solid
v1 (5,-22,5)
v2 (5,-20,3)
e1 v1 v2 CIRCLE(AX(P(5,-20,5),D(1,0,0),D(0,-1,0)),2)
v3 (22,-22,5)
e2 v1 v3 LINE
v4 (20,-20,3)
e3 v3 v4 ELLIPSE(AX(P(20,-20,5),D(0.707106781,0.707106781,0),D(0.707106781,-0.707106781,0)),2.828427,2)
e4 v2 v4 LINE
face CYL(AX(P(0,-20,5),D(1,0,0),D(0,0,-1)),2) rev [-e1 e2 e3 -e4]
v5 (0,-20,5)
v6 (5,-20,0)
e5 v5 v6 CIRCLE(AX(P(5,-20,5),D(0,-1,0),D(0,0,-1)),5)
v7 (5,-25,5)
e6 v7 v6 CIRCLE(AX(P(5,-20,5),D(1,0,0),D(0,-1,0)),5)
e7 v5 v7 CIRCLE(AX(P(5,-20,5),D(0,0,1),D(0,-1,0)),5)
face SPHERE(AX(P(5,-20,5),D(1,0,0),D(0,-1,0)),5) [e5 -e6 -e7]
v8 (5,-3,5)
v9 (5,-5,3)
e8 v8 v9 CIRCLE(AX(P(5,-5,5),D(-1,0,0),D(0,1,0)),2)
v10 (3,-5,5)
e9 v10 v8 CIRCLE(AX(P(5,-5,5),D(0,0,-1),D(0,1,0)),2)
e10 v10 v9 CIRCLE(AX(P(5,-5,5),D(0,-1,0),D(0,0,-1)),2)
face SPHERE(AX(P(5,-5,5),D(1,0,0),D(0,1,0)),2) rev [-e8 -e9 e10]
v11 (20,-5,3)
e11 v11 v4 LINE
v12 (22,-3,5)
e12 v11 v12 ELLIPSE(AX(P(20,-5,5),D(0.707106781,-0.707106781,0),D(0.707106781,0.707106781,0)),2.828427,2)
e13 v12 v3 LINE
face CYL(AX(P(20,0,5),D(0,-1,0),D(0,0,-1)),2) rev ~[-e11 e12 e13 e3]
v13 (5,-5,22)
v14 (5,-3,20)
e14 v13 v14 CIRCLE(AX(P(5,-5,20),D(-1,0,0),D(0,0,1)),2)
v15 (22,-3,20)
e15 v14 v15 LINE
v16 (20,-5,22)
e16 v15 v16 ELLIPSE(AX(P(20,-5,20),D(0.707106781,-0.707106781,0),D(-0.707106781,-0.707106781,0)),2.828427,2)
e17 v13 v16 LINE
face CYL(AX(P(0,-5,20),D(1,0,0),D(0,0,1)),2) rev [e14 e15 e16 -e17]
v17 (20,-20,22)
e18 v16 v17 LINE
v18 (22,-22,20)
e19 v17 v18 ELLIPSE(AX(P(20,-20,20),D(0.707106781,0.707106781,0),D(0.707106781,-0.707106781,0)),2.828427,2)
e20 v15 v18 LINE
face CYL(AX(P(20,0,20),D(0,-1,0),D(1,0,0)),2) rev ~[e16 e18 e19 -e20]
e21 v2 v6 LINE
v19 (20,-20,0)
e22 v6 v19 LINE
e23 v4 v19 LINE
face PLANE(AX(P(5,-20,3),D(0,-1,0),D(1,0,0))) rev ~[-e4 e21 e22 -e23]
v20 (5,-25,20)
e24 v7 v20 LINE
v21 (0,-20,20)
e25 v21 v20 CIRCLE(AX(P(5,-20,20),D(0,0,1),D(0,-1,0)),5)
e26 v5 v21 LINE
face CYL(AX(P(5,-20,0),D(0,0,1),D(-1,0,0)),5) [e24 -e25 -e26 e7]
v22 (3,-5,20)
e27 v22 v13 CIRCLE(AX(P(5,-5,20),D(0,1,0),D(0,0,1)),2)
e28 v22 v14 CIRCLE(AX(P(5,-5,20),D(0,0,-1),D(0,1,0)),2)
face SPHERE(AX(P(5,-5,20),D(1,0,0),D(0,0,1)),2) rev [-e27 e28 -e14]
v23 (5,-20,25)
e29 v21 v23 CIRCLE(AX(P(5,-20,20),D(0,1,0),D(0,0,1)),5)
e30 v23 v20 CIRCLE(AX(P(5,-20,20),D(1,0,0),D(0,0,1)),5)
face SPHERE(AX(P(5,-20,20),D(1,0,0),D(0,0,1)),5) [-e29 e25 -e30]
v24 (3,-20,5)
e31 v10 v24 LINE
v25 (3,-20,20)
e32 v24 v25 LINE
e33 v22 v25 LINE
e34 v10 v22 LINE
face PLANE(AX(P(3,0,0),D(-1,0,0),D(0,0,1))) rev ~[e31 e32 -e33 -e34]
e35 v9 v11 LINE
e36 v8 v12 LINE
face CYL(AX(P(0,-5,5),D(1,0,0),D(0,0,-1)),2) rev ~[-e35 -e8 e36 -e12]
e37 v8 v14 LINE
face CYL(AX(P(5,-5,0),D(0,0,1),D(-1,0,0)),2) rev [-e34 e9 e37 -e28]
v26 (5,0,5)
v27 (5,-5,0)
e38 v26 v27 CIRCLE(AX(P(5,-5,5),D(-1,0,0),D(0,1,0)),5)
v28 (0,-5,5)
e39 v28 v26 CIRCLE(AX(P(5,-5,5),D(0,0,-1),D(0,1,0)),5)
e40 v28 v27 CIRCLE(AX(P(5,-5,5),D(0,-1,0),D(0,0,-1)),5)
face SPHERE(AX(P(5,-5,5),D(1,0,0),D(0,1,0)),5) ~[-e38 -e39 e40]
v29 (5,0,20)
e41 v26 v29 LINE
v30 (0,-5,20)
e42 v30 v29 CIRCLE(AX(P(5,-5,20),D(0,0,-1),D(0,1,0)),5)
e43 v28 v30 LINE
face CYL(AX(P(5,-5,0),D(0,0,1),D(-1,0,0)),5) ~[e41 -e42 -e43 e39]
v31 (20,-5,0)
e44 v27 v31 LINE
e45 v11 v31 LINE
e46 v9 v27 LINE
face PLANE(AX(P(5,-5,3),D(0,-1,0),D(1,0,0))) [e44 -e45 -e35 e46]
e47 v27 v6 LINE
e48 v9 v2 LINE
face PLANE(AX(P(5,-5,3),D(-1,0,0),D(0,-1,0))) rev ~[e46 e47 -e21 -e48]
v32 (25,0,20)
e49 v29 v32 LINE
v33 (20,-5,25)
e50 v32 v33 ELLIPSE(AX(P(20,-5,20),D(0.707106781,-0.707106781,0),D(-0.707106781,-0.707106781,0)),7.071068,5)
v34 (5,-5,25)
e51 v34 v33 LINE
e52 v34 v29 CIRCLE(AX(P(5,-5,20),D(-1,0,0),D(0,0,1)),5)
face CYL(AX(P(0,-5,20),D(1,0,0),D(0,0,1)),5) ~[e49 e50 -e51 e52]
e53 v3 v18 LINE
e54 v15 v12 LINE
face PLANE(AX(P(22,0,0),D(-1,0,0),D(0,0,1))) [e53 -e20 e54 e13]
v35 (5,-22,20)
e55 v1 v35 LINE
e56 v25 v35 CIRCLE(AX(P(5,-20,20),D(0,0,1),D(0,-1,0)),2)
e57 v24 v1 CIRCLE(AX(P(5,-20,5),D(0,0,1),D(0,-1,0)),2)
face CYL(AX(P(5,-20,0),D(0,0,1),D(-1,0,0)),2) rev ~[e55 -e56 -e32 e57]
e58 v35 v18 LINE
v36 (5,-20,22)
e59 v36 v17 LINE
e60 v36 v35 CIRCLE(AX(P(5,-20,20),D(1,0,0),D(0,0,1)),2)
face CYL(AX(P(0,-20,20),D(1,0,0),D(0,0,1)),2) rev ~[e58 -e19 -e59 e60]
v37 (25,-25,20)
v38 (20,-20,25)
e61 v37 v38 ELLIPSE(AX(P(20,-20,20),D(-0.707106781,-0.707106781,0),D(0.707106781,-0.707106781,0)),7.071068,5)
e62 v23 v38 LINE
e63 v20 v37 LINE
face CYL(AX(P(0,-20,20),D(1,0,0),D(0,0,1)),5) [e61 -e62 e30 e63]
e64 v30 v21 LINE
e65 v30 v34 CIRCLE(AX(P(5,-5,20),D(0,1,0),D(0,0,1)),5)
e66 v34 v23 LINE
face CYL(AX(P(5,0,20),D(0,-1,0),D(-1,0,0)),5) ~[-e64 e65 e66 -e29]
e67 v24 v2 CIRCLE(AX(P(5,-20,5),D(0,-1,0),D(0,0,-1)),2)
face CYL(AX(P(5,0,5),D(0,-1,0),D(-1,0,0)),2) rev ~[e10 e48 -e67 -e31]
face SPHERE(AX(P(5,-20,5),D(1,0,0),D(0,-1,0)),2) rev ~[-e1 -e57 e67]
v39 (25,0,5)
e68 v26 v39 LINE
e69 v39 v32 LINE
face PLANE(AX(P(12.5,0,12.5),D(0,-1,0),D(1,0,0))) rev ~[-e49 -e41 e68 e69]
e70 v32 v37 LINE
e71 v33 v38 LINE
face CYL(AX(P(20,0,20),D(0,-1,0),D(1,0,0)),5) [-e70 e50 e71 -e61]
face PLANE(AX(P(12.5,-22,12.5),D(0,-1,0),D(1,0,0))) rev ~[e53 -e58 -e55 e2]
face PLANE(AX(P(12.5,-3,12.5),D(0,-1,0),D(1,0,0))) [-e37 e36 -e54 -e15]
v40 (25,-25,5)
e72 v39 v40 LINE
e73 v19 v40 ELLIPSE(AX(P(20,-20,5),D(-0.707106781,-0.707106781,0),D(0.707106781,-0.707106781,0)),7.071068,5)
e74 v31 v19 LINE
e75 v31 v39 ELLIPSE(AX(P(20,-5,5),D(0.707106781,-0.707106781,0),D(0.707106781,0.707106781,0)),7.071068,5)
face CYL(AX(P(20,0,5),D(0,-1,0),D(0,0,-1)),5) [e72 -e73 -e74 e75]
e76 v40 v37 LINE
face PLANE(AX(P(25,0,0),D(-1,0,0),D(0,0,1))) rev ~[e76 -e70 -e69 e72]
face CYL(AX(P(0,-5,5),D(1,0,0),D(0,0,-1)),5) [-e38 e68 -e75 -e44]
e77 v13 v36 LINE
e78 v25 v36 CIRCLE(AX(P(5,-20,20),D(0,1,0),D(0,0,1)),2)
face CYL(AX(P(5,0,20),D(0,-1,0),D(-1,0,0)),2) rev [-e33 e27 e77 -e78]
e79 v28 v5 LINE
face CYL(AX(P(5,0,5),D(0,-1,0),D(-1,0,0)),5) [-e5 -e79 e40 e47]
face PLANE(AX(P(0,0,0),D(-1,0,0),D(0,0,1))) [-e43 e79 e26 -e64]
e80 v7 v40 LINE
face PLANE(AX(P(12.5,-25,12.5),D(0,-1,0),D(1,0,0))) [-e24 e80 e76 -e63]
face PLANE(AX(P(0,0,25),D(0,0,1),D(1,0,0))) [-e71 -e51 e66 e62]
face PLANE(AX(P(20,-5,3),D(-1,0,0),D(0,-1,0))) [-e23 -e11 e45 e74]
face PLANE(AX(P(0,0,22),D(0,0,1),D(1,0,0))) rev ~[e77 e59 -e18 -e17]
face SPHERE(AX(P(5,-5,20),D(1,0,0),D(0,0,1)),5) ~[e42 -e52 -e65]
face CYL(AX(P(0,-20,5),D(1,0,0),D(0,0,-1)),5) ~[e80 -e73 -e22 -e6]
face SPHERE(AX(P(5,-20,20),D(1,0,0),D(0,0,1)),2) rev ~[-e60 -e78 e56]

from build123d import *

# Parameters (mm, degrees)
F0_W     = 25
F0_H     = 25
F1_DEPTH = 25
F2_R     = 5
F3_T     = -3


# Not quite as in the source:
# - a shell that OpenCascade refuses in one call is made with other operations: the cavity is built on its own and cut out


with BuildPart() as f1:
    # F0 (on Front) → F1 (new body)
    with BuildSketch(Plane.XZ):
        with Locations((12.5, 12.5)):
            Rectangle(F0_W, F0_H)
    extrude(amount=F1_DEPTH)

    # F2
    f2_edges = [f1.edges().sort_by_distance(p)[0] for p in [
        (12.5, 0, 0),
        (25, -12.5, 0),
        (25, -12.5, 25),
        (12.5, 0, 25),
        (12.5, -25, 25),
        (0, -12.5, 25),
        (12.5, -25, 0),
        (0, -25, 12.5),
        (0, 0, 12.5),
        (0, -12.5, 0),
    ]]
    fillet(f2_edges, radius=F2_R)

    # F3: a shell. OpenCascade refuses it in one call, so the cavity is built on its own and cut out:
    # the body offset inwards by the wall thickness, plus a prism from it out through each open face.
    f3_core = offset(f1.part, amount=F3_T, mode=Mode.PRIVATE)
    f3_exits = [f3_core.faces().sort_by_distance(p)[0] for p in [
        (12.5, -12.5, 3),
    ]]
    add(f3_core, mode=Mode.SUBTRACT)
    extrude(f3_exits, amount=-F3_T, mode=Mode.SUBTRACT)


solid = f1.part
